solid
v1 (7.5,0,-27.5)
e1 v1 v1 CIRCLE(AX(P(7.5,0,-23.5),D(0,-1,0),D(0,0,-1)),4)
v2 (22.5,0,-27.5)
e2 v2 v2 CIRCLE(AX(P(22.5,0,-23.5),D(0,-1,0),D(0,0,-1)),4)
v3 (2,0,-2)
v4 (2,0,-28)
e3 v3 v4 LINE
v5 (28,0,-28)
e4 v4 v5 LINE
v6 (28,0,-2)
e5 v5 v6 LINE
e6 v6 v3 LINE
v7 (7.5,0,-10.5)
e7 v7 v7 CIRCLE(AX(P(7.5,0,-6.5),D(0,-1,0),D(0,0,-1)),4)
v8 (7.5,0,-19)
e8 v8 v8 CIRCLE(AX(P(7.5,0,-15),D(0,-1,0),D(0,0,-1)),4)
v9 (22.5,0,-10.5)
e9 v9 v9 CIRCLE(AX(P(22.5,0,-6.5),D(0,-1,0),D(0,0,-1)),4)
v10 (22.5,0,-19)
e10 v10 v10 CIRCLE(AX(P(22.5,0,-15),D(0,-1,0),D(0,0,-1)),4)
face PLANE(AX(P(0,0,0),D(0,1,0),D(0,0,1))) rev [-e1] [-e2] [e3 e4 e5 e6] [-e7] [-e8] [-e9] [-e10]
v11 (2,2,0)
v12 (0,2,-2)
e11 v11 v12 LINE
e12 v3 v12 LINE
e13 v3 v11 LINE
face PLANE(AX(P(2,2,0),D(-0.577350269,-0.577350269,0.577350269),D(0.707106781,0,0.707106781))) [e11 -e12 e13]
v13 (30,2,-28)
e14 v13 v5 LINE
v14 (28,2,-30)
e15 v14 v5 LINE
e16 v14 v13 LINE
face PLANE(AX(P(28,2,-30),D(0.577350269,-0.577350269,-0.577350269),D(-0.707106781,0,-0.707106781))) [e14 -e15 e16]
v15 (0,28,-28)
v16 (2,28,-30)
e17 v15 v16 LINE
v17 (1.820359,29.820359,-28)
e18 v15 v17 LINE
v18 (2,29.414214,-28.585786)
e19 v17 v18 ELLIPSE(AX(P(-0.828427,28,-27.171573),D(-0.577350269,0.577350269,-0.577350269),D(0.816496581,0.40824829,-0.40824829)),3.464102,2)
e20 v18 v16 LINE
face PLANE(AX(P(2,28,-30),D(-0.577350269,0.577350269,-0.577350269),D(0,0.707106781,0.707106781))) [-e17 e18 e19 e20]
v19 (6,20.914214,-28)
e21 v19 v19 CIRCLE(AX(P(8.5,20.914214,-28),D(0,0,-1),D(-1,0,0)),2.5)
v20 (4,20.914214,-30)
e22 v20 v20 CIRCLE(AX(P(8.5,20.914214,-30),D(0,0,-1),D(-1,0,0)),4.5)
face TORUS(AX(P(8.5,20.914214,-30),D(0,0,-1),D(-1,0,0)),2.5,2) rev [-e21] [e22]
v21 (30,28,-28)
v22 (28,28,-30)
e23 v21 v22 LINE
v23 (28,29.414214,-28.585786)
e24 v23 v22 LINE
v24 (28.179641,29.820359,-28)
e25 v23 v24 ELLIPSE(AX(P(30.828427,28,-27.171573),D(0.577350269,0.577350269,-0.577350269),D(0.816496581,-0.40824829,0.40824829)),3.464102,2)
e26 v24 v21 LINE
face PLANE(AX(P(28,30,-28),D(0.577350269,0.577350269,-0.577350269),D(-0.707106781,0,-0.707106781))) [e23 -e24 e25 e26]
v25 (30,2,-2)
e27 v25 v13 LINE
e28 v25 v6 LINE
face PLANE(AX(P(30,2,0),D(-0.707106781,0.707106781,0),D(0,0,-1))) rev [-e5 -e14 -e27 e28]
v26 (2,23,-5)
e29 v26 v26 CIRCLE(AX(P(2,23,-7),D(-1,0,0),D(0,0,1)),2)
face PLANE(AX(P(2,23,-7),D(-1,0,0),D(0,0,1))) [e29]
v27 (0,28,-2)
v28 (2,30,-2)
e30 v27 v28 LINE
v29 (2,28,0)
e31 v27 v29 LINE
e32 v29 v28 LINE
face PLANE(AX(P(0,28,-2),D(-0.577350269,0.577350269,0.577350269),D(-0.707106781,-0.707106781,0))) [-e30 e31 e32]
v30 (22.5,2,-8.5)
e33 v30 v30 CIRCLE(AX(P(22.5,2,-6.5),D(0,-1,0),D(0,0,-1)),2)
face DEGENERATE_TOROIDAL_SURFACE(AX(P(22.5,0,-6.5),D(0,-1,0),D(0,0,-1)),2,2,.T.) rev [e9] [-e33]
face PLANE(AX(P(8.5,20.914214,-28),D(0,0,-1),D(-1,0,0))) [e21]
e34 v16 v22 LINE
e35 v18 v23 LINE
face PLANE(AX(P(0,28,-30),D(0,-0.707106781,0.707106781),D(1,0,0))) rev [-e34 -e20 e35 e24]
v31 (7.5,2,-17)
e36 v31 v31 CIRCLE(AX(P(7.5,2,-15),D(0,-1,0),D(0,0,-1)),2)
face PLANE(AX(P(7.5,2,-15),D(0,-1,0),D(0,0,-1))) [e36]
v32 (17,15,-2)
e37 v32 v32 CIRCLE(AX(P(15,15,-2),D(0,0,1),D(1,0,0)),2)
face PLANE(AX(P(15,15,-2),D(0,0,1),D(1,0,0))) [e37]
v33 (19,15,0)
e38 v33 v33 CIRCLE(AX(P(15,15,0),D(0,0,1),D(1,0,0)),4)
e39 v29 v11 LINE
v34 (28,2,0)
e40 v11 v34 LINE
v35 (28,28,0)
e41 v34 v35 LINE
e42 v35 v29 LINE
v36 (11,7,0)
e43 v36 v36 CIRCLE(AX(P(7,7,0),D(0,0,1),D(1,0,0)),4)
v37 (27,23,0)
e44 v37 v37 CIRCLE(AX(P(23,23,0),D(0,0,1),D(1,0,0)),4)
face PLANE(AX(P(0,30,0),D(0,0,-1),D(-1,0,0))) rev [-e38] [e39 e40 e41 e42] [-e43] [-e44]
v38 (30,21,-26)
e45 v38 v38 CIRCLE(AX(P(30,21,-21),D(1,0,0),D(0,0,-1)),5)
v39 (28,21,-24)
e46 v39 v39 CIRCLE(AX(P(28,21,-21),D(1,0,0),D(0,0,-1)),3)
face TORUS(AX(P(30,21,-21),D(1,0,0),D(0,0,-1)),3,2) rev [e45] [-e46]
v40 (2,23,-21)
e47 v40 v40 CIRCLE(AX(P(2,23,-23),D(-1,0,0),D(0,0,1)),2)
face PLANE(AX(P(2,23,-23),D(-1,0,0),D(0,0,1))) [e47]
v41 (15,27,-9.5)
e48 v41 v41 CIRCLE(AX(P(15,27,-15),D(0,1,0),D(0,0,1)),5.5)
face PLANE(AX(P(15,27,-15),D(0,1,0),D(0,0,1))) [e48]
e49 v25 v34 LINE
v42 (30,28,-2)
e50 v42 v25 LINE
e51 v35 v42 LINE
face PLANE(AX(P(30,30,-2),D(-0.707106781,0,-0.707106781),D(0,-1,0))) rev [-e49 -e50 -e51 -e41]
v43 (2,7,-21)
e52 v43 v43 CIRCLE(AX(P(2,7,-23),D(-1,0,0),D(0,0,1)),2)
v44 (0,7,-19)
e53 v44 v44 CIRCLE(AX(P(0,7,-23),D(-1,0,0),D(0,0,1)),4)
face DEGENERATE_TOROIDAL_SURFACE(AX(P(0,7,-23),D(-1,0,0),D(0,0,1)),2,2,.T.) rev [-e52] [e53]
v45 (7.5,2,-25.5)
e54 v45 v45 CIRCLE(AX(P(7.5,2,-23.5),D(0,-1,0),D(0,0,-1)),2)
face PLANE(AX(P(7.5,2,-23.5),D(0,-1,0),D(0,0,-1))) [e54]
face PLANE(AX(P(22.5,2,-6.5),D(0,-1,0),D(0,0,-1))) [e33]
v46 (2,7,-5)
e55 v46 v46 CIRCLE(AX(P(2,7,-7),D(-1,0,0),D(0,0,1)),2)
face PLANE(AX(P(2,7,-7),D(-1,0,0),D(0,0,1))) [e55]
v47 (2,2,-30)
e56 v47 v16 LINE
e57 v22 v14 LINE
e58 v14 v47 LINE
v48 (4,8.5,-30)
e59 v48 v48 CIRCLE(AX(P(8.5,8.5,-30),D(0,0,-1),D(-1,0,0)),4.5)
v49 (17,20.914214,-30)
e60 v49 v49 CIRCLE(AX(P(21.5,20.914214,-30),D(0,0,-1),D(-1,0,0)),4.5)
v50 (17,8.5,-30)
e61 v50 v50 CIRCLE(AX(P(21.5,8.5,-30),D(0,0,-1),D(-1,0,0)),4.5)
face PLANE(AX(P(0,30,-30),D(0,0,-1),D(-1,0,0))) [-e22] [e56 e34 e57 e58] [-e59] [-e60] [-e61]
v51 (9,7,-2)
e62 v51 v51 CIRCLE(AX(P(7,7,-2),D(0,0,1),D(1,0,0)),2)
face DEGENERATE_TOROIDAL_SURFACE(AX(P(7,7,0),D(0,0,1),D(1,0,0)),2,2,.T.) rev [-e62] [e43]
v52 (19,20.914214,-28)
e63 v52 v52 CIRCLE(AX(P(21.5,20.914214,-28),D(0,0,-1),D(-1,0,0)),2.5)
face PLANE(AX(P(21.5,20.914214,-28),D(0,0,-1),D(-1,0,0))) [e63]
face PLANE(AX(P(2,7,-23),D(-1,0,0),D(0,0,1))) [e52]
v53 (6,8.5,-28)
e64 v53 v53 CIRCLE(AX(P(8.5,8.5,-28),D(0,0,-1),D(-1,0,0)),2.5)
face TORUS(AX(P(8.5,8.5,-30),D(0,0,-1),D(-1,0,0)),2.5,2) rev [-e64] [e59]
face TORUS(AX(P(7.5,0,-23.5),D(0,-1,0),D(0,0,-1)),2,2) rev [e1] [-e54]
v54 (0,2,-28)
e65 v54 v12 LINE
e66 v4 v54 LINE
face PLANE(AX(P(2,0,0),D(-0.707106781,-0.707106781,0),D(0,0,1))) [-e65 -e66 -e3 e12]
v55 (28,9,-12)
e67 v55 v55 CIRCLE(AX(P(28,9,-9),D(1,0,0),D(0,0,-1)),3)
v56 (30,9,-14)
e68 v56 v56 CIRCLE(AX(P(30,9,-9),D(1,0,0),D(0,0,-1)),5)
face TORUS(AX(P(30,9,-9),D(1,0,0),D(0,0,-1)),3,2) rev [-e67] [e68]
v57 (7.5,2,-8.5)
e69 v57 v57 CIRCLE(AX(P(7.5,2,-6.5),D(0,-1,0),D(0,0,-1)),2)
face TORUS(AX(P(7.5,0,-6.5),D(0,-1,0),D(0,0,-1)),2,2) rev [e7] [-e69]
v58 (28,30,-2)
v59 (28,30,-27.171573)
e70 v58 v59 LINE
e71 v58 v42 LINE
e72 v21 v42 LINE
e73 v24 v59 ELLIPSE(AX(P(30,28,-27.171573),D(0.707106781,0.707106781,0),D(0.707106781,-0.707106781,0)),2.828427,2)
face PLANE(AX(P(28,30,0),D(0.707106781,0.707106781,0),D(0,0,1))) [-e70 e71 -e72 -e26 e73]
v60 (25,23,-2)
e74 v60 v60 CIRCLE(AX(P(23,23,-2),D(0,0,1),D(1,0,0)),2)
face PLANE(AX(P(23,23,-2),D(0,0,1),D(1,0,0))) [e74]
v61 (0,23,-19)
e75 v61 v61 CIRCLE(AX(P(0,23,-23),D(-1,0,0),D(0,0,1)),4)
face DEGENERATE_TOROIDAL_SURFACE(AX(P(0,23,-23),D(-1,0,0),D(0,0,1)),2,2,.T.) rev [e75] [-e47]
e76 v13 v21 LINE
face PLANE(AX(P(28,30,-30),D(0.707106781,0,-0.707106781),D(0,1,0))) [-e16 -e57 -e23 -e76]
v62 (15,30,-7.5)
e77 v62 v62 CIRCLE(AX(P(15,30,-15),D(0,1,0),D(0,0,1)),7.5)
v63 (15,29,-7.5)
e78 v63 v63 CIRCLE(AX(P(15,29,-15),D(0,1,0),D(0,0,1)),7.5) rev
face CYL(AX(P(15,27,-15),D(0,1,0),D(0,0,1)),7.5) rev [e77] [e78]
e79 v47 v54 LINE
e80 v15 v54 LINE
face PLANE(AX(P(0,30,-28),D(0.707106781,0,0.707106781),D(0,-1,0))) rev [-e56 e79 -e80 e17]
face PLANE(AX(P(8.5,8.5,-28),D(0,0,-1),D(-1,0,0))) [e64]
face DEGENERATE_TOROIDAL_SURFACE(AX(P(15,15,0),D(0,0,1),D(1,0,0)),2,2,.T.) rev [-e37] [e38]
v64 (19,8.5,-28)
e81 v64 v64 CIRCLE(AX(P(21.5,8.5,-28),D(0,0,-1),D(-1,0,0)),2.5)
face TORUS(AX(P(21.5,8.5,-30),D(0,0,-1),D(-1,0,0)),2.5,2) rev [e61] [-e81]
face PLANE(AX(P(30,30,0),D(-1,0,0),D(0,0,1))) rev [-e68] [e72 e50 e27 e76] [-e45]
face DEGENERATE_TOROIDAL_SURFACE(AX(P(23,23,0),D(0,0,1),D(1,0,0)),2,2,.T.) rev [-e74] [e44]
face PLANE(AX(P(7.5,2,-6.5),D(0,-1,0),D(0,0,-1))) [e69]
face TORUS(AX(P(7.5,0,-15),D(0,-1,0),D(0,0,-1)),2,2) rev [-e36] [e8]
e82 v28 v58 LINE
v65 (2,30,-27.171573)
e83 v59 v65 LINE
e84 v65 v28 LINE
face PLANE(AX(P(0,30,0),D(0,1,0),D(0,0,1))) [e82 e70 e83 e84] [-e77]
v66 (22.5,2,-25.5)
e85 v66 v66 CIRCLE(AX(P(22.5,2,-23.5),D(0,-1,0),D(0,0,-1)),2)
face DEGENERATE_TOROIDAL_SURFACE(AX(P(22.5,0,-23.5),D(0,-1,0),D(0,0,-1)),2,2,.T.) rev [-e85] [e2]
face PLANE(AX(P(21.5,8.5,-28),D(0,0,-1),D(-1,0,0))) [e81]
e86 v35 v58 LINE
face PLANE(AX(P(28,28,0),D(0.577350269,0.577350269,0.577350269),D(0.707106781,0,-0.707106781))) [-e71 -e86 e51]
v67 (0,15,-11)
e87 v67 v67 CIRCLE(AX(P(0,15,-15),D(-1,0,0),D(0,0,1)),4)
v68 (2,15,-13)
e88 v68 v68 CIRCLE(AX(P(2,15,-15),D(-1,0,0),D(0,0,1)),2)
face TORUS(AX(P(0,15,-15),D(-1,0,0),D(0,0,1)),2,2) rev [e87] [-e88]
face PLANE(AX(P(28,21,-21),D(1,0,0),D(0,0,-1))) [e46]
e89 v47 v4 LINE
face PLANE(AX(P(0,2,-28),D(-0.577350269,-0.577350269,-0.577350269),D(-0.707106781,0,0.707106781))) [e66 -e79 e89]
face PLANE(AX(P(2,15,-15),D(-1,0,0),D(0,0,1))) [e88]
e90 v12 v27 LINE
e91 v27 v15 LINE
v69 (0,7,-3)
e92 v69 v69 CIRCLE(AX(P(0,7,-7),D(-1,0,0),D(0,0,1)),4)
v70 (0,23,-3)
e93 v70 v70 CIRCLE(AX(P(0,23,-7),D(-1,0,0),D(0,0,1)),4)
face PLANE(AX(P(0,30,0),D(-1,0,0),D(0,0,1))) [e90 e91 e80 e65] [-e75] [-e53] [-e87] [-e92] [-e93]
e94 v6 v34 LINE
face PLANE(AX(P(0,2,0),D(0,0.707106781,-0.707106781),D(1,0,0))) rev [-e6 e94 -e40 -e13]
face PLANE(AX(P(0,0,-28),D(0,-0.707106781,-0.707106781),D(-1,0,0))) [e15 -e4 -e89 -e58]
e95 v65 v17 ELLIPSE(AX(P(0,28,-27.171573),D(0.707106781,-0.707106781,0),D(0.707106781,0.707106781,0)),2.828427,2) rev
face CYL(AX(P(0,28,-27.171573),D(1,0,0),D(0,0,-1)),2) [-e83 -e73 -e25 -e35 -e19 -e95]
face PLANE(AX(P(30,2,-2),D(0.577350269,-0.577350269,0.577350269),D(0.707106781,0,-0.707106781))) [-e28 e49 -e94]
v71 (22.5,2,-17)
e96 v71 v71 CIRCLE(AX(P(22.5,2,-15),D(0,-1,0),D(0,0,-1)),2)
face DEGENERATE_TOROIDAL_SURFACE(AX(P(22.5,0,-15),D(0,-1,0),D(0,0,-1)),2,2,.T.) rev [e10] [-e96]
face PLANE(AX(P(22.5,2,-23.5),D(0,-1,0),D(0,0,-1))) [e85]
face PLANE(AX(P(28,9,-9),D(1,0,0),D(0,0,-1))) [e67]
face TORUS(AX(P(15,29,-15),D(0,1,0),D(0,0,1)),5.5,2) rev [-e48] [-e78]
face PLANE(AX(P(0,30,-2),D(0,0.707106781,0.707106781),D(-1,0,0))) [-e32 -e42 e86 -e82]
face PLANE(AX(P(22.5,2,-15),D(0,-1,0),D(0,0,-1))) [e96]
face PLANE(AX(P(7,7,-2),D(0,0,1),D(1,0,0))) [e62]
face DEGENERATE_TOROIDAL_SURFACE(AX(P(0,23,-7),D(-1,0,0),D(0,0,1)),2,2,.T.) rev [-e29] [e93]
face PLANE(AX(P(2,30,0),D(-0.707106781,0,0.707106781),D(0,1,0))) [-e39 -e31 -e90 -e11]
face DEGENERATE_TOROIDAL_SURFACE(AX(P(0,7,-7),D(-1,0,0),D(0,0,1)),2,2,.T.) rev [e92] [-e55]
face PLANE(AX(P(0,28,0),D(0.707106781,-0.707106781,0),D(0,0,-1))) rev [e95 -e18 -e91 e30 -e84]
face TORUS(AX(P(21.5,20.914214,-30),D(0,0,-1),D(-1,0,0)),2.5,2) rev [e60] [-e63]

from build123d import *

# Parameters (mm, degrees)
SKETCH_7_W          = 30
SKETCH_7_H          = 30
EXTRUDE_1_DEPTH     = 30
CHAMFER_2_SIZE      = 2
SKETCH_11_R         = 7.5
CUT_EXTRUDE_4_DEPTH = 3
FILLET_1_R          = 2
SKETCH_12_R         = 4
CUT_EXTRUDE_5_DEPTH = 2
FILLET_2_R          = 2
SKETCH_13_R         = 4
CUT_EXTRUDE_6_DEPTH = 2
FILLET_3_R          = 2
SKETCH_14_R         = 4.5
CUT_EXTRUDE_7_DEPTH = 2
FILLET_4_R          = 2
SKETCH_15_R         = 5
CUT_EXTRUDE_8_DEPTH = 2
FILLET_5_R          = 2
SKETCH_16_R         = 4
CUT_EXTRUDE_9_DEPTH = 2
FILLET_6_R          = 2


with BuildPart() as part:
    # ｽｹｯﾁ7 → ﾎﾞｽ - 押し出し1 (new body)
    with BuildSketch(Plane(origin=(0, 0, 0), x_dir=(1, 0, 0), z_dir=(0, 1, 0))):
        with Locations((15, 15)):
            Rectangle(SKETCH_7_W, SKETCH_7_H)
    extrude(amount=EXTRUDE_1_DEPTH)

    # 面取り2
    chamfer_2_edges = [part.edges().sort_by_distance(p)[0] for p in [
        (15, 30, 0),
        (0, 30, -15),
        (15, 30, -30),
        (0, 0, -15),
        (15, 0, 0),
        (30, 0, -15),
        (15, 0, -30),
        (0, 15, -30),
        (0, 15, 0),
        (30, 15, 0),
        (30, 15, -30),
        (30, 30, -15),
    ]]
    chamfer(chamfer_2_edges, length=CHAMFER_2_SIZE)

    # ｽｹｯﾁ11 → ｶｯﾄ - 押し出し4 (cut)
    with BuildSketch(Plane(origin=(0, 30, 0), x_dir=(1, 0, 0), z_dir=(0, 1, 0))):
        with Locations(Location((15, 15, 0), (0, 0, 270))):
            Circle(SKETCH_11_R)
    extrude(amount=-CUT_EXTRUDE_4_DEPTH, mode=Mode.SUBTRACT)

    # ﾌｨﾚｯﾄ1
    fillet_1_edges = [part.edges().sort_by_distance(p)[0] for p in [
        (15, 27, -22.5),
    ]]
    fillet(fillet_1_edges, radius=FILLET_1_R)

    # ｽｹｯﾁ12 → ｶｯﾄ - 押し出し5 (cut)
    with BuildSketch(Plane.XY):
        with Locations((23, 23)):
            Circle(SKETCH_12_R)
        with Locations((15, 15)):
            Circle(SKETCH_12_R)
        with Locations((7, 7)):
            Circle(SKETCH_12_R)
    extrude(amount=-CUT_EXTRUDE_5_DEPTH, mode=Mode.SUBTRACT)

    # ﾌｨﾚｯﾄ2
    fillet_2_edges = [part.edges().sort_by_distance(p)[0] for p in [
        (11, 15, -2),
        (3, 7, -2),
        (19, 23, -2),
    ]]
    fillet(fillet_2_edges, radius=FILLET_2_R - 0.0001)  # a hair under: the kernel refuses the full size

    # ｽｹｯﾁ13 → ｶｯﾄ - 押し出し6 (cut)
    with BuildSketch(Plane.XZ):
        with Locations(Location((7.5, -6.5, 0), (0, 0, 270))):
            Circle(SKETCH_13_R)
        with Locations(Location((7.5, -15, 0), (0, 0, 270))):
            Circle(SKETCH_13_R)
        with Locations(Location((7.5, -23.5, 0), (0, 0, 270))):
            Circle(SKETCH_13_R)
        with Locations(Location((22.5, -23.5, 0), (0, 0, 270))):
            Circle(SKETCH_13_R)
        with Locations(Location((22.5, -15, 0), (0, 0, 270))):
            Circle(SKETCH_13_R)
        with Locations(Location((22.5, -6.5, 0), (0, 0, 270))):
            Circle(SKETCH_13_R)
    extrude(amount=-CUT_EXTRUDE_6_DEPTH, mode=Mode.SUBTRACT)

    # ﾌｨﾚｯﾄ3
    fillet_3_edges = [part.edges().sort_by_distance(p)[0] for p in [
        (7.5, 2, -19.5),
        (7.5, 2, -11),
        (7.5, 2, -2.5),
        (15, 30, -28),
        (22.5, 2, -2.5),
        (22.5, 2, -11),
        (22.5, 2, -19.5),
    ]]
    fillet(fillet_3_edges, radius=FILLET_3_R - 0.0001)  # a hair under: the kernel refuses the full size

    # ｽｹｯﾁ14 → ｶｯﾄ - 押し出し7 (cut)
    with BuildSketch(Plane(origin=(0, 0, -30), x_dir=(-1, 0, 0), z_dir=(0, 0, -1))):
        with Locations((-21.5, 20.914213562)):
            Circle(SKETCH_14_R)
        with Locations((-8.5, 20.914213562)):
            Circle(SKETCH_14_R)
        with Locations((-21.5, 8.5)):
            Circle(SKETCH_14_R)
        with Locations((-8.5, 8.5)):
            Circle(SKETCH_14_R)
    extrude(amount=-CUT_EXTRUDE_7_DEPTH, mode=Mode.SUBTRACT)

    # ﾌｨﾚｯﾄ4
    fillet_4_edges = [part.edges().sort_by_distance(p)[0] for p in [
        (26, 8.5, -28),
        (13, 20.914213562, -28),
        (13, 8.5, -28),
        (26, 20.914213562, -28),
    ]]
    fillet(fillet_4_edges, radius=FILLET_4_R - 0.0001)  # a hair under: the kernel refuses the full size

    # ｽｹｯﾁ15 → ｶｯﾄ - 押し出し8 (cut)
    with BuildSketch(Plane(origin=(30, 0, 0), x_dir=(0, 0, -1), z_dir=(1, 0, 0))):
        with Locations((21, 21)):
            Circle(SKETCH_15_R)
        with Locations((9, 9)):
            Circle(SKETCH_15_R)
    extrude(amount=-CUT_EXTRUDE_8_DEPTH, mode=Mode.SUBTRACT)

    # ﾌｨﾚｯﾄ5
    fillet_5_edges = [part.edges().sort_by_distance(p)[0] for p in [
        (28, 21, -16),
        (28, 9, -4),
    ]]
    fillet(fillet_5_edges, radius=FILLET_5_R - 0.0001)  # a hair under: the kernel refuses the full size

    # ｽｹｯﾁ16 → ｶｯﾄ - 押し出し9 (cut)
    with BuildSketch(Plane.ZY):
        with Locations((-23, 23)):
            Circle(SKETCH_16_R)
        with Locations((-23, 7)):
            Circle(SKETCH_16_R)
        with Locations((-15, 15)):
            Circle(SKETCH_16_R)
        with Locations((-7, 23)):
            Circle(SKETCH_16_R)
        with Locations((-7, 7)):
            Circle(SKETCH_16_R)
    extrude(amount=-CUT_EXTRUDE_9_DEPTH, mode=Mode.SUBTRACT)

    # ﾌｨﾚｯﾄ6
    fillet_6_edges = [part.edges().sort_by_distance(p)[0] for p in [
        (2, 15, -19),
        (2, 23, -11),
        (2, 7, -27),
        (2, 7, -11),
        (2, 23, -27),
    ]]
    fillet(fillet_6_edges, radius=FILLET_6_R - 0.0001)  # a hair under: the kernel refuses the full size


solid = part.part
